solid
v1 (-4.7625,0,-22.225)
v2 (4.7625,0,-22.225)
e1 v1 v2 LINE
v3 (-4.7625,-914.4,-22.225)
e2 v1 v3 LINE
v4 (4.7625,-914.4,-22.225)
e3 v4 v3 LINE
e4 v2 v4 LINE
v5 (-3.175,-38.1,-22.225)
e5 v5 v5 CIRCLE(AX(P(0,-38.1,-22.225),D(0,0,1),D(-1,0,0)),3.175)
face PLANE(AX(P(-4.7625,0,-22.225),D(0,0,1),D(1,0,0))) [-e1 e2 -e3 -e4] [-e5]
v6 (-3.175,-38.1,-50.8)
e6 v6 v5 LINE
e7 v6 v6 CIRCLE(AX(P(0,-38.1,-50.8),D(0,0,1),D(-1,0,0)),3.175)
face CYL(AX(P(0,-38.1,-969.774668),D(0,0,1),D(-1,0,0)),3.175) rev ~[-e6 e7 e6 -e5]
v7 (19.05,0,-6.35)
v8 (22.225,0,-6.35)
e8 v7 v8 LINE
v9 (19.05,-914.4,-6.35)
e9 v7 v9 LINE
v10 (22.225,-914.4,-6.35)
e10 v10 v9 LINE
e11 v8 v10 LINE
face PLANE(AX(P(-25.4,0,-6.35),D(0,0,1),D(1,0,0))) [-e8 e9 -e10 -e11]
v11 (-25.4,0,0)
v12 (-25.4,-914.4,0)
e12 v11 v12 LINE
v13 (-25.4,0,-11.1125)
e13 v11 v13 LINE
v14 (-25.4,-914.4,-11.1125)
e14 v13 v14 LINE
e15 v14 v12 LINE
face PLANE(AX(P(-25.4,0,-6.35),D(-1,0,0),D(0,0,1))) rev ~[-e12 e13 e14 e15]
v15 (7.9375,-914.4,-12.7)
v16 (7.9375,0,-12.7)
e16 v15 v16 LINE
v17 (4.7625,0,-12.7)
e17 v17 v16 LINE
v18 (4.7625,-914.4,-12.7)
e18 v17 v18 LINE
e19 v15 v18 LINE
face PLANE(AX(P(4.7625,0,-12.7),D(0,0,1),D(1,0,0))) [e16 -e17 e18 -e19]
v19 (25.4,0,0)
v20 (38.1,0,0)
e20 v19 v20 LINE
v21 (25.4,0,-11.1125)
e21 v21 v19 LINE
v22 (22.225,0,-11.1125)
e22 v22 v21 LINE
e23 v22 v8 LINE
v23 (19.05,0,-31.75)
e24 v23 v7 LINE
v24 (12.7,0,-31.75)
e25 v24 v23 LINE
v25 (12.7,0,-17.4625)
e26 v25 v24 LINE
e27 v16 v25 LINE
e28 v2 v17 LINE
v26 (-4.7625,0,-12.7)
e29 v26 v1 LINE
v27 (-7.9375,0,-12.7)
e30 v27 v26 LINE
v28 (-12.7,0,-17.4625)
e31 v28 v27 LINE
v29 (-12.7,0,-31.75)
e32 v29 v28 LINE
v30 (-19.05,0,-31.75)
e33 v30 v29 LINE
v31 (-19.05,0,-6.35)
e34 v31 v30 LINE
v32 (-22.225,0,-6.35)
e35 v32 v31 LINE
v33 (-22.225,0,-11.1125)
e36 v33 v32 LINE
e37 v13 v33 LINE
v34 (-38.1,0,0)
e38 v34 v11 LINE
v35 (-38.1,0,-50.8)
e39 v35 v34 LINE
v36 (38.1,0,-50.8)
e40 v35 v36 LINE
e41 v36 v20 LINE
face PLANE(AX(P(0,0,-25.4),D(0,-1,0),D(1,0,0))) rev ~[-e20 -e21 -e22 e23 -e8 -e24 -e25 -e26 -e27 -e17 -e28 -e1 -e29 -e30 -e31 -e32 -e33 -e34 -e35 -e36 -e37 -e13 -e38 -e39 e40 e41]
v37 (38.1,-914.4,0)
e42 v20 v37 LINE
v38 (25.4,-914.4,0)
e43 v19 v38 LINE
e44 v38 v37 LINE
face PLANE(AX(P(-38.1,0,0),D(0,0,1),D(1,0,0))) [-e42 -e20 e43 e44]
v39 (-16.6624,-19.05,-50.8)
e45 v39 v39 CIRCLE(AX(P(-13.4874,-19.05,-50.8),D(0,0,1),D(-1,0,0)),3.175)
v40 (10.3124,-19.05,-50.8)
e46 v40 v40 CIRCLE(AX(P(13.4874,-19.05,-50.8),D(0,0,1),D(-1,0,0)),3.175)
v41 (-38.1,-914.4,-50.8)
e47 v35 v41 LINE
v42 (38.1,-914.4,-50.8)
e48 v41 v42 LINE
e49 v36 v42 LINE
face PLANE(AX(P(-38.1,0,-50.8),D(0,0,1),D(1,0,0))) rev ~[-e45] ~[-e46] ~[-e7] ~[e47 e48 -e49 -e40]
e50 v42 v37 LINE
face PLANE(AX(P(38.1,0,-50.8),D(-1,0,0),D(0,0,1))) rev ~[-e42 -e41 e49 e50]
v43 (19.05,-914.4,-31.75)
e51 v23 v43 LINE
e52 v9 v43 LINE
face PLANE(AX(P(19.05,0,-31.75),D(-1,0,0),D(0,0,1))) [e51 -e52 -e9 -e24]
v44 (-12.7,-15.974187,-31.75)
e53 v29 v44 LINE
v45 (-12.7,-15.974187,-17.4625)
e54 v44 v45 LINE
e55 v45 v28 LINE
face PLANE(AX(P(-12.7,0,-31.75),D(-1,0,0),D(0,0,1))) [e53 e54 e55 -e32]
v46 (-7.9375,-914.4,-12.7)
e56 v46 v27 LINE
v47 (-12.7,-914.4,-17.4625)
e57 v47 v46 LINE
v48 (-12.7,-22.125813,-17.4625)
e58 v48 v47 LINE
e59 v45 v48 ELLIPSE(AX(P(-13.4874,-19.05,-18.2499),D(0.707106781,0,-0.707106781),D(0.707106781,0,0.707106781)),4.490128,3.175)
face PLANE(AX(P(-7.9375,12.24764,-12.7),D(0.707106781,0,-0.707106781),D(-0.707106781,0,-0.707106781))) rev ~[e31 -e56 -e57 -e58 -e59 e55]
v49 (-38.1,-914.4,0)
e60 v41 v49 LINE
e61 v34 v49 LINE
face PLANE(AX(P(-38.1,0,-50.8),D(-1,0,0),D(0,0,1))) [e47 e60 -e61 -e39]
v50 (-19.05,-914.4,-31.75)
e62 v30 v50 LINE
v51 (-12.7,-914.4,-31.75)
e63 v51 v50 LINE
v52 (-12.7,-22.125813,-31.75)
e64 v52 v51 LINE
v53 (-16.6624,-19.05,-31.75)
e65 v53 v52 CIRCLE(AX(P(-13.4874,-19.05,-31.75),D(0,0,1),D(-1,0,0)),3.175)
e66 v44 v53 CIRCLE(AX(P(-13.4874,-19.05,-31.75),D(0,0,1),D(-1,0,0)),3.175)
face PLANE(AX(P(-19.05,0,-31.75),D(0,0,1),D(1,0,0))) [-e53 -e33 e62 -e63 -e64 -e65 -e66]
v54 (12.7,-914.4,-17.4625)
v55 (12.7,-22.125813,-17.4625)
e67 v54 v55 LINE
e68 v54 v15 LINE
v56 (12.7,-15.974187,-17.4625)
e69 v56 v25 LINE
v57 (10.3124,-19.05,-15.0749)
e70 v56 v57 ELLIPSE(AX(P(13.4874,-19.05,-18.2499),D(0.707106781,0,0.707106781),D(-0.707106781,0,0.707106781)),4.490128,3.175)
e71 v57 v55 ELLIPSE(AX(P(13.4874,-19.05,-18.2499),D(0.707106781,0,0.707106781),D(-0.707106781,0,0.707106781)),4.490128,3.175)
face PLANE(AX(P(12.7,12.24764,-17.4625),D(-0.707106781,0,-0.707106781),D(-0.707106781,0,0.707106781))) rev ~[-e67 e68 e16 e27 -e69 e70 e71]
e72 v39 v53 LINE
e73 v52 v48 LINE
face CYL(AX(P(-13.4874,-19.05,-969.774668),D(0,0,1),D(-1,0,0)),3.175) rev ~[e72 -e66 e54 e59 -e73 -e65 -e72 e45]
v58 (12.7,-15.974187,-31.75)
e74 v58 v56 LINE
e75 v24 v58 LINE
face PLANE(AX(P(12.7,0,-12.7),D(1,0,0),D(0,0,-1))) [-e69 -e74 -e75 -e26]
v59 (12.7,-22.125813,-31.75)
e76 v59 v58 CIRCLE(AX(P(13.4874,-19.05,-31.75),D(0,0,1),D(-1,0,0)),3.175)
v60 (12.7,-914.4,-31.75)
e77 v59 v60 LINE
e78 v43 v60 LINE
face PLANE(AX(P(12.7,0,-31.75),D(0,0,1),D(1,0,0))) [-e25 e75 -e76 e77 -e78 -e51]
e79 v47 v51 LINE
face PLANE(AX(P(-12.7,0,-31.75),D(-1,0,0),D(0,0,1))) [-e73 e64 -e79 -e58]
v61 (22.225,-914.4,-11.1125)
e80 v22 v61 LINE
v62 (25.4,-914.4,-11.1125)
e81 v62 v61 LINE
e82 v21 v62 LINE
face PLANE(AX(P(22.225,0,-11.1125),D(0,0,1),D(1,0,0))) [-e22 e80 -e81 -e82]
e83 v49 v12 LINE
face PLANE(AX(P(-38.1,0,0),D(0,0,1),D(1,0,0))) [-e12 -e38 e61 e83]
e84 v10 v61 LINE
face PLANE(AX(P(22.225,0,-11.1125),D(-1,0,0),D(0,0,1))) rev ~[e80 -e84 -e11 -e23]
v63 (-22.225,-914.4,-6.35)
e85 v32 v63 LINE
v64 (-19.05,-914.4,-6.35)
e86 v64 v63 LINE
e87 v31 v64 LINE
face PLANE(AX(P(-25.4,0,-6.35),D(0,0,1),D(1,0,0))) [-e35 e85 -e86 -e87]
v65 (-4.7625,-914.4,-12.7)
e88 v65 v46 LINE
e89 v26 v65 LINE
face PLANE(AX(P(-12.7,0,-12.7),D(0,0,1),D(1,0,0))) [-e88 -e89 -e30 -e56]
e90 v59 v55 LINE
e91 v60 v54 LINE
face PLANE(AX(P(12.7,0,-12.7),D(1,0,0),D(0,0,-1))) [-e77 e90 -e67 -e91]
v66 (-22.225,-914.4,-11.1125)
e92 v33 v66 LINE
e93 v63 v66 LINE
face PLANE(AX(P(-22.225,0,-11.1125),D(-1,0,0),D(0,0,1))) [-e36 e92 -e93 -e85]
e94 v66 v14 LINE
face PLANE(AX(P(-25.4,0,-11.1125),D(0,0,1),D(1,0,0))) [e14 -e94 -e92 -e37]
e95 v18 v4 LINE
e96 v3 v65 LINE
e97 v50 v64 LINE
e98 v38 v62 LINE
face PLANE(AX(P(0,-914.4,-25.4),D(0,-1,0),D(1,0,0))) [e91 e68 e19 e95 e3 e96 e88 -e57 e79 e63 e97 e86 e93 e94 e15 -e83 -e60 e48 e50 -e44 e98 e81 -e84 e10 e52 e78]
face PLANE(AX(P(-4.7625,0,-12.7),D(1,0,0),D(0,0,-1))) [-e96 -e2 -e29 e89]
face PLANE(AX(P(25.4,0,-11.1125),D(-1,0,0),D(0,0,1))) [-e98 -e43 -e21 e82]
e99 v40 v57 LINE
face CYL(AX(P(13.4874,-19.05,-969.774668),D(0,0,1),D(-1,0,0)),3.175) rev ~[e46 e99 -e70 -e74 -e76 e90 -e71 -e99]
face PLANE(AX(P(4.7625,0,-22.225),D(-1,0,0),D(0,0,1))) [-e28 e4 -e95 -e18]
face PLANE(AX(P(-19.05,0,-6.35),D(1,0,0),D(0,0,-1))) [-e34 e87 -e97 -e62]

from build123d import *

# Parameters (mm, degrees)
F0_W         = 76.2
F0_H         = 50.8
F1_DEPTH     = 914.4
F2_W         = 50.8
F2_H         = 6.35
F3_DEPTH     = 914.401
F5_DEPTH     = 914.401
F6_W         = 3.175
F6_H         = 4.7625
F7_DEPTH     = 914.401
F9_D         = 6.35
F10_D        = 6.35
F11_T1_DEPTH = 916.7694673581
F11_T3_DEPTH = 40.4694673581


# Not quite as in the source:
# - a fillet or chamfer that OpenCascade refuses, or shapes differently, is made with other operations: its cross-section is extruded or revolved along the edge and cut away or added


with BuildPart() as f1:
    # F0 (on Front) → F1 (new body)
    with BuildSketch(Plane.XZ):
        with Locations((0, -25.4)):
            Rectangle(F0_W, F0_H)
    extrude(amount=F1_DEPTH)

    # F2 (on Front) → F3 (cut, through all)
    with BuildSketch(Plane.XZ):
        with Locations((0, -3.175)):
            Rectangle(F2_W, F2_H)
    extrude(amount=F3_DEPTH, mode=Mode.SUBTRACT)

    # F4 (on Front) → F5 (cut, through all)
    with BuildSketch(Plane.XZ):
        Polygon((0, -6.35), (-19.05, -6.35), (-19.05, -31.75), (-12.7, -31.75), (-12.7, -12.7), (-4.7625, -12.7), (-4.7625, -22.225), (0, -22.225), (4.7625, -22.225), (4.7625, -12.7), (12.7, -12.7), (12.7, -31.75), (19.05, -31.75), (19.05, -6.35), align=None)
    extrude(amount=F5_DEPTH, mode=Mode.SUBTRACT)

    # F6 (on Front) → F7 (cut, through all)
    with BuildSketch(Plane.XZ):
        with Locations((-23.8125, -8.73125)):
            Rectangle(F6_W, F6_H)
        with Locations((23.8125, -8.73125)):
            Rectangle(F6_W, F6_H)
    extrude(amount=F7_DEPTH, mode=Mode.SUBTRACT)

    # F9 (through all)
    with Locations(Plane(origin=(0, 0, -50.8), x_dir=(1, 0, 0), z_dir=(0, 0, -1))):
        with Locations((0, 38.1)):
            Hole(F9_D / 2)

    # F10 (through all)
    with Locations(Plane(origin=(0, 0, -50.8), x_dir=(1, 0, 0), z_dir=(0, 0, -1))):
        with Locations((-13.4874, 19.05), (13.4874, 19.05)):
            Hole(F10_D / 2)

    # F11: chamfer of 4.7625 on 4 edges, made by hand

    # F11_s2 → F11_t1 (cut)
    with BuildSketch(Plane.XZ.offset(9.8781728721)):
        Polygon((-7.9375, -12.7), (-12.7, -17.4625), (-12.7, -12.7), align=None)
        Polygon((7.9375, -12.7), (12.7, -17.4625), (12.7, -12.7), align=None)
    extrude(amount=F11_T1_DEPTH, mode=Mode.SUBTRACT)

    # F11_s4 → F11_t3 (cut)
    with BuildSketch(Plane.XZ.offset(-12.2476402302)):
        Polygon((12.7, -17.4625), (7.9375, -12.7), (12.7, -12.7), align=None)
        Polygon((-7.9375, -12.7), (-12.7, -17.4625), (-12.7, -12.7), align=None)
    extrude(amount=F11_T3_DEPTH, mode=Mode.SUBTRACT)


solid = f1.part
